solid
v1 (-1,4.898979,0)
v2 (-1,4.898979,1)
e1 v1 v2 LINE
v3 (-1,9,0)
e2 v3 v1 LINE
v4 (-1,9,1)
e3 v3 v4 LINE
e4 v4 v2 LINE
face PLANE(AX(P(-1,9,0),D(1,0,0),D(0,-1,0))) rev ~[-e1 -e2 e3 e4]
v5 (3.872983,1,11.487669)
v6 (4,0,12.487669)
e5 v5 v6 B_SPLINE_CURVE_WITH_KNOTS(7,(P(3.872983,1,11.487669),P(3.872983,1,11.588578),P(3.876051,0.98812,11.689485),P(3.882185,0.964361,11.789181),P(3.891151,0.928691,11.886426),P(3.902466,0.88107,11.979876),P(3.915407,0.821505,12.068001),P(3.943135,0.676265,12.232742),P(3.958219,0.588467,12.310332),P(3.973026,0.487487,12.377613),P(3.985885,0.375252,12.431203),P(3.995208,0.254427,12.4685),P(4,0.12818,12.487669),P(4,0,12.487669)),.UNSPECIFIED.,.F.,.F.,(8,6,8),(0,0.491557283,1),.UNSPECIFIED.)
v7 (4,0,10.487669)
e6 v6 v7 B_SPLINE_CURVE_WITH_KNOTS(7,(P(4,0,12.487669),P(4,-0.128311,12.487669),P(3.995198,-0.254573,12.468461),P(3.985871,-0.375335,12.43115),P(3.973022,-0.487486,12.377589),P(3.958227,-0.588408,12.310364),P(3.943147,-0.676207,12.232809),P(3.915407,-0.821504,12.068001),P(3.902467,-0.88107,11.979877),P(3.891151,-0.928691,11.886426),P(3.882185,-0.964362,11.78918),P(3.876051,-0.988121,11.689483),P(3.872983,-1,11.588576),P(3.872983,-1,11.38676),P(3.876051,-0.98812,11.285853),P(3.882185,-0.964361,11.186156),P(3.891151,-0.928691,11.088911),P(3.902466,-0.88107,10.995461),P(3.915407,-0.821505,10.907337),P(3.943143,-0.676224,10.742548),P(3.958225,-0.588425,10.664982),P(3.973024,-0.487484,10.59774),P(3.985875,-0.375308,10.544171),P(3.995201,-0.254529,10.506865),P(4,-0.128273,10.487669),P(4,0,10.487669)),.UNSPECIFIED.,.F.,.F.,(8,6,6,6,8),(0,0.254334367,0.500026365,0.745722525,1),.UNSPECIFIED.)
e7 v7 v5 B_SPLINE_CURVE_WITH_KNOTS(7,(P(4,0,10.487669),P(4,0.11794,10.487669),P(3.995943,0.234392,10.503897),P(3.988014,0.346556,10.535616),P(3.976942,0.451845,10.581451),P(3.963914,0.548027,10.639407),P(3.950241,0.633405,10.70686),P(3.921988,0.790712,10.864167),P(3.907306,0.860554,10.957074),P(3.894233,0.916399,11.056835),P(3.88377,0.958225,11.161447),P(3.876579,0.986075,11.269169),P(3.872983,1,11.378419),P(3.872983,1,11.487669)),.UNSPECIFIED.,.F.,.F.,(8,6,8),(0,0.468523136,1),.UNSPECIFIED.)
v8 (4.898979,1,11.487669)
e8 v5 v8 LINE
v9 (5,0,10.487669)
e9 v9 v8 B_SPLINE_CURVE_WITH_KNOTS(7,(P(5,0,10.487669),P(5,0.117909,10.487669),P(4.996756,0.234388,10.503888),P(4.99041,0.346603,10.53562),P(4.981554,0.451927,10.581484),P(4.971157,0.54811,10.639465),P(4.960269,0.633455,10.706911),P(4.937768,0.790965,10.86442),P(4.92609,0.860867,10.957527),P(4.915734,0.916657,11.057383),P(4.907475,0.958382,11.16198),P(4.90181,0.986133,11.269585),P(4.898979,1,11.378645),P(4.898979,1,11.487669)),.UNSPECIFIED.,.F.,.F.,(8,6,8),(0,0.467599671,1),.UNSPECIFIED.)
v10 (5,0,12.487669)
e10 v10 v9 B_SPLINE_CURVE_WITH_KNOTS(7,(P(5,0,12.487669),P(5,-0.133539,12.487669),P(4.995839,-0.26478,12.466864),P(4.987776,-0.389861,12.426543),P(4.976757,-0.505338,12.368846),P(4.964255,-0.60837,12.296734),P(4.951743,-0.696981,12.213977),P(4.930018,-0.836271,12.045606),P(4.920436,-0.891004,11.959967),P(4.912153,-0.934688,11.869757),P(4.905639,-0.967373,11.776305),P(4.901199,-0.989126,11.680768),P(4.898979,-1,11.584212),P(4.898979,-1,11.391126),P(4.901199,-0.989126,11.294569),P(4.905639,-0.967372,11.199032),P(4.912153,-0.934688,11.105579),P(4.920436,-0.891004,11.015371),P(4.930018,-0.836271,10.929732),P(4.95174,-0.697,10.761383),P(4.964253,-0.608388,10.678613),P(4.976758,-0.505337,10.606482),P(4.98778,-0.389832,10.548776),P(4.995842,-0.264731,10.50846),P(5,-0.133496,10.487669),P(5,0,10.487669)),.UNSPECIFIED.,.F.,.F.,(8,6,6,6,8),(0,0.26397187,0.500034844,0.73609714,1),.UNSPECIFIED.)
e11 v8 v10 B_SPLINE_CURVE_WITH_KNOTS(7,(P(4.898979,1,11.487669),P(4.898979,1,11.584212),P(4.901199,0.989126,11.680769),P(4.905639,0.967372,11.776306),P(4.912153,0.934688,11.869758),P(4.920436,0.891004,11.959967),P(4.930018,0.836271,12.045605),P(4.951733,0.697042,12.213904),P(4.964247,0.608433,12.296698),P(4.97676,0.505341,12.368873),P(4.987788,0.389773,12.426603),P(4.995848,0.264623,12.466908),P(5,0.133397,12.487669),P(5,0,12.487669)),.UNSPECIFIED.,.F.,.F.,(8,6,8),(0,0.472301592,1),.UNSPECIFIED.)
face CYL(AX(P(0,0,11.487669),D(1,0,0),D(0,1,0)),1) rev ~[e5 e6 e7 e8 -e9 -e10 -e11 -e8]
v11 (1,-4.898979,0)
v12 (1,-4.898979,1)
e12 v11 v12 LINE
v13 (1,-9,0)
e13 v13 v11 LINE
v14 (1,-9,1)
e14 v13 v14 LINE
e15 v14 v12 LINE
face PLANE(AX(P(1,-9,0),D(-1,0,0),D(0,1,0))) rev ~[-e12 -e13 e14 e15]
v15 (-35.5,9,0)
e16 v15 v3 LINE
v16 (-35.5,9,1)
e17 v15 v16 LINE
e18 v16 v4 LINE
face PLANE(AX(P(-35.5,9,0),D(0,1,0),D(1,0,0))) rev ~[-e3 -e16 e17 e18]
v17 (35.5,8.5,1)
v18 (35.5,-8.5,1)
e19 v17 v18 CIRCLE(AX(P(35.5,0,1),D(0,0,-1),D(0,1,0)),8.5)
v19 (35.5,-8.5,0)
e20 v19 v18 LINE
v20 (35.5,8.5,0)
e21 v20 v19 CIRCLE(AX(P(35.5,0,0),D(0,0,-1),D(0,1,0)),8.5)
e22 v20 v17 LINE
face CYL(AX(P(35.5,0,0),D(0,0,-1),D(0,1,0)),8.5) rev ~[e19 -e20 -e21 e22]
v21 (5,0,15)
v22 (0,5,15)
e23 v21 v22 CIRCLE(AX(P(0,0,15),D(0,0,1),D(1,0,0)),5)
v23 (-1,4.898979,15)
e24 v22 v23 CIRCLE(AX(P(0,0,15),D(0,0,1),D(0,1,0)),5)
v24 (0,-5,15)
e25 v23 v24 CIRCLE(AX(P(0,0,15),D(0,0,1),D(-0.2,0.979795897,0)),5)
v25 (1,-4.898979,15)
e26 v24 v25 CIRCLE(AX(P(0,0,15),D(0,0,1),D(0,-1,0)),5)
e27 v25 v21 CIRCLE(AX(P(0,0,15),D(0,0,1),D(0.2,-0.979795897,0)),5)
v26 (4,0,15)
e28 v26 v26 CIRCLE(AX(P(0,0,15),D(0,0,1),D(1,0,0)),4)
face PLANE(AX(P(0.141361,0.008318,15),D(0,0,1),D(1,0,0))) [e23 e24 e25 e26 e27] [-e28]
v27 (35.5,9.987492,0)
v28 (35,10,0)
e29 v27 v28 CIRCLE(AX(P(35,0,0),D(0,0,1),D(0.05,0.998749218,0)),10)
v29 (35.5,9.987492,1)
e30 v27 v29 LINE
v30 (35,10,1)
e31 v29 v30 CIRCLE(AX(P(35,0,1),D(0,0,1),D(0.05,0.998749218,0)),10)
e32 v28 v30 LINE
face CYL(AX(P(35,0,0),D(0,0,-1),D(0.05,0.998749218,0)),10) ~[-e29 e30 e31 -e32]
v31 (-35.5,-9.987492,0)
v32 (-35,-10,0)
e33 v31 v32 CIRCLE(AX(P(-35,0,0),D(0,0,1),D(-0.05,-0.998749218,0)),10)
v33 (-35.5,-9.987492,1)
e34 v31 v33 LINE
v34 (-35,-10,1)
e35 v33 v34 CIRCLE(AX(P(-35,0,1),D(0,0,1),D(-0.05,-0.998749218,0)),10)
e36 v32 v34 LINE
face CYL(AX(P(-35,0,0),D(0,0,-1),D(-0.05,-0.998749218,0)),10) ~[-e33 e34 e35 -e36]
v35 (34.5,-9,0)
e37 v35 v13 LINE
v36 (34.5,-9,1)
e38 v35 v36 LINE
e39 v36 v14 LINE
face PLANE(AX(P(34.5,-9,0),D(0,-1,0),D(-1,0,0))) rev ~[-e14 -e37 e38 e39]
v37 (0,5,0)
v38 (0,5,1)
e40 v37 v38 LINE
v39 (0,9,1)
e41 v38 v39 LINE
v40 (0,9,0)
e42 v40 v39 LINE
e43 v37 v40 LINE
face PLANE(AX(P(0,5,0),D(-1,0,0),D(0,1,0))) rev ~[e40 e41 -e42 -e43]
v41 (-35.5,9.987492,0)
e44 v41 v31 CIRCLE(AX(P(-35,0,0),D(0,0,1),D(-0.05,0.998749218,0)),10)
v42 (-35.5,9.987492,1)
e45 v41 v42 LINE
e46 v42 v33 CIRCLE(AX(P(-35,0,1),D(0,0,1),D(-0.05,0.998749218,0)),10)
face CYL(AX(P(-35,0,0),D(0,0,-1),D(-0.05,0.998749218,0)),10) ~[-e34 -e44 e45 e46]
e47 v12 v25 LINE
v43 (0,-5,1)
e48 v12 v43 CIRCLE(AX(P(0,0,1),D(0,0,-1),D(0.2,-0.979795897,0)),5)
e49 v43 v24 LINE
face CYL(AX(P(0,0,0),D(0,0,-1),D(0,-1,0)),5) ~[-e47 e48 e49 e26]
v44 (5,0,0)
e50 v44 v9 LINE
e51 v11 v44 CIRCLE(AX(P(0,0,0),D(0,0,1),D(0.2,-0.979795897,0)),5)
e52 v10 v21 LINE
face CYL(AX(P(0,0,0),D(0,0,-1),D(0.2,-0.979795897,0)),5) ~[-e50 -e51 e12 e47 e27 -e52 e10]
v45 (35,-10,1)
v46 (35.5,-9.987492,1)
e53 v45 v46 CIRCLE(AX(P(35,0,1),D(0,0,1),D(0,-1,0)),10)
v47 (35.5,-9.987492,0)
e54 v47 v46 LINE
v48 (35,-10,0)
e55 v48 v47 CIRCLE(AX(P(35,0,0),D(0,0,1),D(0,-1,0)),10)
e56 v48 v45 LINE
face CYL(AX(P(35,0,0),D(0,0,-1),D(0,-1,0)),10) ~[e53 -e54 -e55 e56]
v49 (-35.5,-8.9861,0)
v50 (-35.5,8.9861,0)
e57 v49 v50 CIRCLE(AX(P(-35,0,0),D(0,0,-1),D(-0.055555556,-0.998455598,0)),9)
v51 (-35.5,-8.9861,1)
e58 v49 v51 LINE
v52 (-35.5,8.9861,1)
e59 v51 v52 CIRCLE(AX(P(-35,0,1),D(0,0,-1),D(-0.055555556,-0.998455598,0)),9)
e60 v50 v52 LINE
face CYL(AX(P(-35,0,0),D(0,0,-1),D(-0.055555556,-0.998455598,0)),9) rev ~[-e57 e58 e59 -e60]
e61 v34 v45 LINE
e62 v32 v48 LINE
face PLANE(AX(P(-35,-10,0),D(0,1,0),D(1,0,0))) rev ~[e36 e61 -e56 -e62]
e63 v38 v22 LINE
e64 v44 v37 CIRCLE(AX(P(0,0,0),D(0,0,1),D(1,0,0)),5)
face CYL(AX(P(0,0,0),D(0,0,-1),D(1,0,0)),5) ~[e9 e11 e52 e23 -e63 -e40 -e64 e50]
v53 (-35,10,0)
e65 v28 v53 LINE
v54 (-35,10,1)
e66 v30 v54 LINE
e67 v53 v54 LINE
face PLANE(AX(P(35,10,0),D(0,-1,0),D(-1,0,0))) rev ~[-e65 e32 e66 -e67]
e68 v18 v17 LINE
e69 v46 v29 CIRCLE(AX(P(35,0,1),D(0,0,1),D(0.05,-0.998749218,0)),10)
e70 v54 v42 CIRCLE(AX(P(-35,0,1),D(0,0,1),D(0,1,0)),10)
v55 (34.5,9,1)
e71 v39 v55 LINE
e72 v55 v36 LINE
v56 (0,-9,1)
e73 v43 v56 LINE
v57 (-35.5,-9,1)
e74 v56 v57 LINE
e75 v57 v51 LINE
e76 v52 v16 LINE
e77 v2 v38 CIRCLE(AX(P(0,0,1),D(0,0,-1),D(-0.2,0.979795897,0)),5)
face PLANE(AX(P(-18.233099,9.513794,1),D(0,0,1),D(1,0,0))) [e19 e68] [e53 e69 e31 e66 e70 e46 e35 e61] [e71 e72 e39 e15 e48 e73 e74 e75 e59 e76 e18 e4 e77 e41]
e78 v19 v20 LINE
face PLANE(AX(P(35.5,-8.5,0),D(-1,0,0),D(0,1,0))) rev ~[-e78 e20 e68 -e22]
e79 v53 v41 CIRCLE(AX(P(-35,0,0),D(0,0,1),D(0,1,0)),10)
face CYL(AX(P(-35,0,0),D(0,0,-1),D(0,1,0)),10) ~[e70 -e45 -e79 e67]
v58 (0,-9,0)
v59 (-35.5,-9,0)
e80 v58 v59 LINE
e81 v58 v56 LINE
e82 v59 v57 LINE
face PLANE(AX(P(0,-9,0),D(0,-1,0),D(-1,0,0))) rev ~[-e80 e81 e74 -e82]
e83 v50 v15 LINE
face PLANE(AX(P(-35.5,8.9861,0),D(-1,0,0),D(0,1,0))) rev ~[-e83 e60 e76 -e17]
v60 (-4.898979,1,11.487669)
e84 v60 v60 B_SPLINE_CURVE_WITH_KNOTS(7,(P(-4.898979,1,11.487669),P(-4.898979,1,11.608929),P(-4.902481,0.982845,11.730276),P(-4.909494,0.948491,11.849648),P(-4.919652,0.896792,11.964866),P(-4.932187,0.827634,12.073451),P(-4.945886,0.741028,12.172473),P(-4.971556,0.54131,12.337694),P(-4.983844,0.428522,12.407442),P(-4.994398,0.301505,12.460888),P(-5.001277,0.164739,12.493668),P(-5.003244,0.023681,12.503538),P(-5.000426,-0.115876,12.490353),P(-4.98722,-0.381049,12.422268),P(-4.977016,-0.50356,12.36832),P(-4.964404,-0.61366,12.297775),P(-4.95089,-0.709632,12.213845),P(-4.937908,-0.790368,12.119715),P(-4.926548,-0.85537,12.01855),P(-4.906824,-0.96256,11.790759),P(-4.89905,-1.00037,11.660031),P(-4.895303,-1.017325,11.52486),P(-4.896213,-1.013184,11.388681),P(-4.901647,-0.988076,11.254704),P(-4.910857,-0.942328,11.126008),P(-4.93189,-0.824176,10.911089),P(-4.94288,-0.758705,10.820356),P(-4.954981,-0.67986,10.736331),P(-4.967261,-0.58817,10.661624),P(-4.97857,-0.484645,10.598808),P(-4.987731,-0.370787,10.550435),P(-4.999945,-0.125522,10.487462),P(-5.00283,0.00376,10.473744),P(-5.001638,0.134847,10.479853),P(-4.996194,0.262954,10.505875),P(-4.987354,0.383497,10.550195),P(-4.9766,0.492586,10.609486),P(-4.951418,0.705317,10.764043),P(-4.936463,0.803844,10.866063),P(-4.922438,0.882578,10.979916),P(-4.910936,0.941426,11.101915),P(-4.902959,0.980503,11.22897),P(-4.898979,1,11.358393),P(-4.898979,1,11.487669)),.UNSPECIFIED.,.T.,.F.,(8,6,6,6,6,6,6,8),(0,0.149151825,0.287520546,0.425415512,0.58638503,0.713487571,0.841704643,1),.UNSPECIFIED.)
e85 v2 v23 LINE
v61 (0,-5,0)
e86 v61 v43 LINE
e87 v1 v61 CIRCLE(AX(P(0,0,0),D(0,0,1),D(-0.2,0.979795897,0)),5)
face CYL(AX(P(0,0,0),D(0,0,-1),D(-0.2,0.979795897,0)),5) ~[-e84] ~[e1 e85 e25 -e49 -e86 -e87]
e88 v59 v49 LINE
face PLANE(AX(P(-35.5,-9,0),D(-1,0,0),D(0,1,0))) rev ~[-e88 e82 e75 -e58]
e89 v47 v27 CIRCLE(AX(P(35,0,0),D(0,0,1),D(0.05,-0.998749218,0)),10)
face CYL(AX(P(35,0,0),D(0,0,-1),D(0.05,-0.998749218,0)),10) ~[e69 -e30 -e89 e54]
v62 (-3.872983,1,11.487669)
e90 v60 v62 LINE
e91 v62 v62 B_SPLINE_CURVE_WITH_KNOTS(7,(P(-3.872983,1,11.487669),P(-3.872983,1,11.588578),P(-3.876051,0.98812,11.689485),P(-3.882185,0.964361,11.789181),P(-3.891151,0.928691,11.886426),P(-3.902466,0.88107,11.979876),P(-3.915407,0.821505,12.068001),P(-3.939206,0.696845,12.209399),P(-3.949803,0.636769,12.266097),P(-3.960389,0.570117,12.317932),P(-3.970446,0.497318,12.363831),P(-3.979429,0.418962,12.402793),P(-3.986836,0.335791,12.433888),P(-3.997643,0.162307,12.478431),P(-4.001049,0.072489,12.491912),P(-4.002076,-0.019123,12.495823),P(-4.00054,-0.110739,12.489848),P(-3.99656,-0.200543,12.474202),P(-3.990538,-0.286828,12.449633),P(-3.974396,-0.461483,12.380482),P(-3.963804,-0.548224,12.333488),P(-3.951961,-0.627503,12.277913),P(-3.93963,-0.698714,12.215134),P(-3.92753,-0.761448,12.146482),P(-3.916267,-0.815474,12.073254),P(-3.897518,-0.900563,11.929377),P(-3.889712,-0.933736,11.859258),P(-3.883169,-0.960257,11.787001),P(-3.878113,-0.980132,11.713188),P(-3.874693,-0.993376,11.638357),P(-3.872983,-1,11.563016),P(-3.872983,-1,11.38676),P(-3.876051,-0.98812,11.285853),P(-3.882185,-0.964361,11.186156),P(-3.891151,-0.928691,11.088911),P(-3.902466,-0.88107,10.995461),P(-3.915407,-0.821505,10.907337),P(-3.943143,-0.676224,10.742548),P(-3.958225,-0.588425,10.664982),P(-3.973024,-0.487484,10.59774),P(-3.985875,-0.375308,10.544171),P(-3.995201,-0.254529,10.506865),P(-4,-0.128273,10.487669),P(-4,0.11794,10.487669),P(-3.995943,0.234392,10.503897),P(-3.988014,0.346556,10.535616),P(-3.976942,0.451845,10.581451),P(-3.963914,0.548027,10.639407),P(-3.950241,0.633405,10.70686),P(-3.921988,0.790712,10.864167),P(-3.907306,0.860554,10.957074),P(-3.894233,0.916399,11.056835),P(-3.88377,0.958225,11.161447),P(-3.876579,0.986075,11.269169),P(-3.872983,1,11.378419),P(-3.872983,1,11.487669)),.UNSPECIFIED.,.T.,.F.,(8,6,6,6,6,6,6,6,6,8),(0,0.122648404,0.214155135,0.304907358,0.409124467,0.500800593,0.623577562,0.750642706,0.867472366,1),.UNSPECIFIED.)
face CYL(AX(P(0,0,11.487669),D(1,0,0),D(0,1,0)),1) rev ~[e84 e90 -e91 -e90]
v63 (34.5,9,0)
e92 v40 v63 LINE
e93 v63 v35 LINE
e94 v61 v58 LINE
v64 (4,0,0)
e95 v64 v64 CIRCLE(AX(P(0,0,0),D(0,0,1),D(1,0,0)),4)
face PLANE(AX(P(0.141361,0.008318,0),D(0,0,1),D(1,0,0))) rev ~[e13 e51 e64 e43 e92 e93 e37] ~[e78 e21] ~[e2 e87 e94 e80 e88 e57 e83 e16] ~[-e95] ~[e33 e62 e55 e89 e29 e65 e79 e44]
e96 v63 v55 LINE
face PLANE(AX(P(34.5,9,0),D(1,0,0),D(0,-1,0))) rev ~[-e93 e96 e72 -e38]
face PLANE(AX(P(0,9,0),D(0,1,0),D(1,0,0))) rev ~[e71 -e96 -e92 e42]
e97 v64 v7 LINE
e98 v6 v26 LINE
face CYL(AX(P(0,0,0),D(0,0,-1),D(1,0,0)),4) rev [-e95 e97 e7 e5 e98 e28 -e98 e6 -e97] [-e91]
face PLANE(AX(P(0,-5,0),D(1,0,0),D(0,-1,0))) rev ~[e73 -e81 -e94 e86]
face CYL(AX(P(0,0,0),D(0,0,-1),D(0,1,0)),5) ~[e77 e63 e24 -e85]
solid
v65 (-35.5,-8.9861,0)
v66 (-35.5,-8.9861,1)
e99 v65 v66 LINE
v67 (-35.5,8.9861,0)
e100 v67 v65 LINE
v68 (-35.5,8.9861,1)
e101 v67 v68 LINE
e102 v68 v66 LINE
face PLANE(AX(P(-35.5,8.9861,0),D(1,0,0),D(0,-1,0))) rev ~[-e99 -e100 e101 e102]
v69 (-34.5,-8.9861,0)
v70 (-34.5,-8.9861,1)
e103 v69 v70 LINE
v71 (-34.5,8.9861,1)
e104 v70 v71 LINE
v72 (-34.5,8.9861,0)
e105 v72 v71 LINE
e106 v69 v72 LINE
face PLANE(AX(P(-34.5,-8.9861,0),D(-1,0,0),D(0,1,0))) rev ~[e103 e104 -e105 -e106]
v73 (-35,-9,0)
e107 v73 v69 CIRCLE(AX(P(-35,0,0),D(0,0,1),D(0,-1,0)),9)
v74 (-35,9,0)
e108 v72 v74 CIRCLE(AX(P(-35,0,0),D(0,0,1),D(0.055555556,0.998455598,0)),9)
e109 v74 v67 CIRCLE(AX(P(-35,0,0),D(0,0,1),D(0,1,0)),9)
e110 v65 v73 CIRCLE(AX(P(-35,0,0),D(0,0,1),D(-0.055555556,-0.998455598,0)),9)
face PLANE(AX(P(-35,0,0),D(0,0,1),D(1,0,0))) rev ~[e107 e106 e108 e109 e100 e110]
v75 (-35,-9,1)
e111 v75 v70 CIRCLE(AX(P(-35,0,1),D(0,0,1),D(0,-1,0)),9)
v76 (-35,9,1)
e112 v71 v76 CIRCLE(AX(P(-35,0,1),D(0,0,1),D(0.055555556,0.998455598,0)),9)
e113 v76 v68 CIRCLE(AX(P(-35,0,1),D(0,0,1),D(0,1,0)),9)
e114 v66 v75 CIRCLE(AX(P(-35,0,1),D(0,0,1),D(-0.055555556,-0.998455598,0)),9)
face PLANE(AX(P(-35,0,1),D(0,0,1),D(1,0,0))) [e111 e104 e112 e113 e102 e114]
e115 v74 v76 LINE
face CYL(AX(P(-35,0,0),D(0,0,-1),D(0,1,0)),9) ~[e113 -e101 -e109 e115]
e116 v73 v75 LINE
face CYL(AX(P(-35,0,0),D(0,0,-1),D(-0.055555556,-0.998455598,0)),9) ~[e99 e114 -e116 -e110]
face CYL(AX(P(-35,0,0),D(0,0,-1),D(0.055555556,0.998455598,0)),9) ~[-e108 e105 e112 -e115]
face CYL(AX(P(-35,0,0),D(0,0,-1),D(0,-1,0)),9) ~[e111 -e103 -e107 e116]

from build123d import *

# Parameters (mm, degrees)
F0_W     = 1
F0_H     = 1
F0_W_2   = 34.5
F0_H_2   = 3
F0_W_3   = 33.5
F1_DEPTH = 1
F0_R     = 4
F2_DEPTH = 15
F3_R     = 1
F4_DEPTH = 12.5


with BuildPart() as f1:
    # F0 (on Top) → F1 (new body)
    with BuildSketch(Plane.XY):
        with BuildLine():
            Line((-1, 10), (-35, 10))
            ThreePointArc((-35, 10), (-35.2500782106, 9.9968725554), (-35.5, 9.9874921777))
            Line((-35.5, 9.9874921777), (-34.5, 9.9874921777))
            Line((-34.5, 9.9874921777), (-34.5, 9))
            Line((-34.5, 9), (-1, 9))
            Line((-1, 9), (-1, 10))
        make_face()
        with Locations((-0.5, 9.5)):
            Rectangle(F0_W, F0_H)
        with BuildLine():
            Line((-35.5, 9), (-35.5, 9.9874921777))
            ThreePointArc((-35.5, 9.9874921777), (-45, 0), (-35.5, -9.9874921777))
            Line((-35.5, -9.9874921777), (-35.5, -9))
            Line((-35.5, -9), (-35.5, -8.9861003778))
            ThreePointArc((-35.5, -8.9861003778), (-44, 0), (-35.5, 8.9861003778))
            Line((-35.5, 8.9861003778), (-35.5, 9))
        make_face()
        Polygon((-34.5, 9.9874921777), (-35.5, 9.9874921777), (-35.5, 9), (-35, 9), (-34.5, 9), align=None)
        with Locations((17.25, 9.5)):
            Rectangle(F0_W_2, F0_H)
        with Locations((-0.5, 7.5)):
            Rectangle(F0_W, F0_H_2)
        with BuildLine():
            Line((-34.5, -9.9874921777), (-35.5, -9.9874921777))
            ThreePointArc((-35.5, -9.9874921777), (-35.2500782106, -9.9968725554), (-35, -10))
            Line((-35, -10), (0, -10))
            Line((0, -10), (0, -9))
            Line((0, -9), (-34.5, -9))
            Line((-34.5, -9), (-34.5, -9.9874921777))
        make_face()
        Polygon((-35.5, -9), (-35.5, -9.9874921777), (-34.5, -9.9874921777), (-34.5, -9), (-35, -9), align=None)
        with BuildLine():
            Line((35, 10), (34.5, 10))
            Line((34.5, 10), (34.5, 9))
            Line((34.5, 9), (35.5, 9))
            Line((35.5, 9), (35.5, 9.9874921777))
            ThreePointArc((35.5, 9.9874921777), (35.2500782106, 9.9968725554), (35, 10))
        make_face()
        with BuildLine():
            Line((0, 6), (-1, 6))
            Line((-1, 6), (-1, 4.8989794856))
            ThreePointArc((-1, 4.8989794856), (-0.50254481, 4.974680765), (0, 5))
            Line((0, 5), (0, 6))
        make_face()
        with BuildLine():
            Line((35.5, 9), (34.5, 9))
            Line((34.5, 9), (34.5, 8.4409715081))
            ThreePointArc((34.5, 8.4409715081), (34.9991296668, 8.4852300446), (35.5, 8.5))
            Line((35.5, 8.5), (35.5, 9))
        make_face()
        with Locations((0.5, -9.5)):
            Rectangle(F0_W, F0_H)
        with BuildLine():
            ThreePointArc((35.5, -9.9874921777), (45, 0), (35.5, 9.9874921777))
            Line((35.5, 9.9874921777), (35.5, 9))
            Line((35.5, 9), (35.5, 8.5))
            ThreePointArc((35.5, 8.5), (44, 0), (35.5, -8.5))
            Line((35.5, -8.5), (35.5, -9))
            Line((35.5, -9), (35.5, -9.9874921777))
        make_face()
        with BuildLine():
            ThreePointArc((35.5, 8.5), (34.9991296668, 8.4852300446), (34.5, 8.4409715081))
            Line((34.5, 8.4409715081), (34.5, -8.4409715081))
            ThreePointArc((34.5, -8.4409715081), (34.9991296668, -8.4852300446), (35.5, -8.5))
            Line((35.5, -8.5), (35.5, 8.5))
        make_face()
        with BuildLine():
            ThreePointArc((1, -4.8989794856), (0.50254481, -4.974680765), (0, -5))
            Line((0, -5), (0, -6))
            Line((0, -6), (1, -6))
            Line((1, -6), (1, -4.8989794856))
        make_face()
        with Locations((17.75, -9.5)):
            Rectangle(F0_W_3, F0_H)
        with Locations((0.5, -7.5)):
            Rectangle(F0_W, F0_H_2)
        with BuildLine():
            ThreePointArc((35, -10), (35.2500782106, -9.9968725554), (35.5, -9.9874921777))
            Line((35.5, -9.9874921777), (35.5, -9))
            Line((35.5, -9), (34.5, -9))
            Line((34.5, -9), (34.5, -10))
            Line((34.5, -10), (35, -10))
        make_face()
        with BuildLine():
            ThreePointArc((35.5, -8.5), (34.9991296668, -8.4852300446), (34.5, -8.4409715081))
            Line((34.5, -8.4409715081), (34.5, -9))
            Line((34.5, -9), (35.5, -9))
            Line((35.5, -9), (35.5, -8.5))
        make_face()
    extrude(amount=F1_DEPTH)

    # F0 (on Top) → F2 (join)
    with BuildSketch(Plane.XY):
        with BuildLine():
            ThreePointArc((0, 5), (-0.50254481, 4.974680765), (-1, 4.8989794856))
            ThreePointArc((-1, 4.8989794856), (-4.974680765, -0.50254481), (0, -5))
            ThreePointArc((0, -5), (0.50254481, -4.974680765), (1, -4.8989794856))
            ThreePointArc((1, -4.8989794856), (3.8729833462, -3.1622776602), (5, 0))
            ThreePointArc((5, 0), (3.5355339059, 3.5355339059), (0, 5))
        make_face()
        Circle(F0_R, mode=Mode.SUBTRACT)
    extrude(amount=F2_DEPTH)

    # F3 (on Right) → F4 (cut, symmetric)
    with BuildSketch(Plane.YZ):
        with Locations((0, 11.4876687593)):
            Circle(F3_R)
    extrude(amount=F4_DEPTH, both=True, mode=Mode.SUBTRACT)


with BuildPart() as f1b:
    # F0 (on Top) → F1, piece 2 (new body)
    with BuildSketch(Plane.XY):
        with BuildLine():
            ThreePointArc((-35, 9), (-35.2500965811, 8.9965244234), (-35.5, 8.9861003778))
            Line((-35.5, 8.9861003778), (-35.5, -8.9861003778))
            ThreePointArc((-35.5, -8.9861003778), (-35.2500965811, -8.9965244234), (-35, -9))
            ThreePointArc((-35, -9), (-34.7499034189, -8.9965244234), (-34.5, -8.9861003778))
            Line((-34.5, -8.9861003778), (-34.5, 8.9861003778))
            ThreePointArc((-34.5, 8.9861003778), (-34.7499034189, 8.9965244234), (-35, 9))
        make_face()
    extrude(amount=F1_DEPTH)


solid = Compound([f1.part, f1b.part])
